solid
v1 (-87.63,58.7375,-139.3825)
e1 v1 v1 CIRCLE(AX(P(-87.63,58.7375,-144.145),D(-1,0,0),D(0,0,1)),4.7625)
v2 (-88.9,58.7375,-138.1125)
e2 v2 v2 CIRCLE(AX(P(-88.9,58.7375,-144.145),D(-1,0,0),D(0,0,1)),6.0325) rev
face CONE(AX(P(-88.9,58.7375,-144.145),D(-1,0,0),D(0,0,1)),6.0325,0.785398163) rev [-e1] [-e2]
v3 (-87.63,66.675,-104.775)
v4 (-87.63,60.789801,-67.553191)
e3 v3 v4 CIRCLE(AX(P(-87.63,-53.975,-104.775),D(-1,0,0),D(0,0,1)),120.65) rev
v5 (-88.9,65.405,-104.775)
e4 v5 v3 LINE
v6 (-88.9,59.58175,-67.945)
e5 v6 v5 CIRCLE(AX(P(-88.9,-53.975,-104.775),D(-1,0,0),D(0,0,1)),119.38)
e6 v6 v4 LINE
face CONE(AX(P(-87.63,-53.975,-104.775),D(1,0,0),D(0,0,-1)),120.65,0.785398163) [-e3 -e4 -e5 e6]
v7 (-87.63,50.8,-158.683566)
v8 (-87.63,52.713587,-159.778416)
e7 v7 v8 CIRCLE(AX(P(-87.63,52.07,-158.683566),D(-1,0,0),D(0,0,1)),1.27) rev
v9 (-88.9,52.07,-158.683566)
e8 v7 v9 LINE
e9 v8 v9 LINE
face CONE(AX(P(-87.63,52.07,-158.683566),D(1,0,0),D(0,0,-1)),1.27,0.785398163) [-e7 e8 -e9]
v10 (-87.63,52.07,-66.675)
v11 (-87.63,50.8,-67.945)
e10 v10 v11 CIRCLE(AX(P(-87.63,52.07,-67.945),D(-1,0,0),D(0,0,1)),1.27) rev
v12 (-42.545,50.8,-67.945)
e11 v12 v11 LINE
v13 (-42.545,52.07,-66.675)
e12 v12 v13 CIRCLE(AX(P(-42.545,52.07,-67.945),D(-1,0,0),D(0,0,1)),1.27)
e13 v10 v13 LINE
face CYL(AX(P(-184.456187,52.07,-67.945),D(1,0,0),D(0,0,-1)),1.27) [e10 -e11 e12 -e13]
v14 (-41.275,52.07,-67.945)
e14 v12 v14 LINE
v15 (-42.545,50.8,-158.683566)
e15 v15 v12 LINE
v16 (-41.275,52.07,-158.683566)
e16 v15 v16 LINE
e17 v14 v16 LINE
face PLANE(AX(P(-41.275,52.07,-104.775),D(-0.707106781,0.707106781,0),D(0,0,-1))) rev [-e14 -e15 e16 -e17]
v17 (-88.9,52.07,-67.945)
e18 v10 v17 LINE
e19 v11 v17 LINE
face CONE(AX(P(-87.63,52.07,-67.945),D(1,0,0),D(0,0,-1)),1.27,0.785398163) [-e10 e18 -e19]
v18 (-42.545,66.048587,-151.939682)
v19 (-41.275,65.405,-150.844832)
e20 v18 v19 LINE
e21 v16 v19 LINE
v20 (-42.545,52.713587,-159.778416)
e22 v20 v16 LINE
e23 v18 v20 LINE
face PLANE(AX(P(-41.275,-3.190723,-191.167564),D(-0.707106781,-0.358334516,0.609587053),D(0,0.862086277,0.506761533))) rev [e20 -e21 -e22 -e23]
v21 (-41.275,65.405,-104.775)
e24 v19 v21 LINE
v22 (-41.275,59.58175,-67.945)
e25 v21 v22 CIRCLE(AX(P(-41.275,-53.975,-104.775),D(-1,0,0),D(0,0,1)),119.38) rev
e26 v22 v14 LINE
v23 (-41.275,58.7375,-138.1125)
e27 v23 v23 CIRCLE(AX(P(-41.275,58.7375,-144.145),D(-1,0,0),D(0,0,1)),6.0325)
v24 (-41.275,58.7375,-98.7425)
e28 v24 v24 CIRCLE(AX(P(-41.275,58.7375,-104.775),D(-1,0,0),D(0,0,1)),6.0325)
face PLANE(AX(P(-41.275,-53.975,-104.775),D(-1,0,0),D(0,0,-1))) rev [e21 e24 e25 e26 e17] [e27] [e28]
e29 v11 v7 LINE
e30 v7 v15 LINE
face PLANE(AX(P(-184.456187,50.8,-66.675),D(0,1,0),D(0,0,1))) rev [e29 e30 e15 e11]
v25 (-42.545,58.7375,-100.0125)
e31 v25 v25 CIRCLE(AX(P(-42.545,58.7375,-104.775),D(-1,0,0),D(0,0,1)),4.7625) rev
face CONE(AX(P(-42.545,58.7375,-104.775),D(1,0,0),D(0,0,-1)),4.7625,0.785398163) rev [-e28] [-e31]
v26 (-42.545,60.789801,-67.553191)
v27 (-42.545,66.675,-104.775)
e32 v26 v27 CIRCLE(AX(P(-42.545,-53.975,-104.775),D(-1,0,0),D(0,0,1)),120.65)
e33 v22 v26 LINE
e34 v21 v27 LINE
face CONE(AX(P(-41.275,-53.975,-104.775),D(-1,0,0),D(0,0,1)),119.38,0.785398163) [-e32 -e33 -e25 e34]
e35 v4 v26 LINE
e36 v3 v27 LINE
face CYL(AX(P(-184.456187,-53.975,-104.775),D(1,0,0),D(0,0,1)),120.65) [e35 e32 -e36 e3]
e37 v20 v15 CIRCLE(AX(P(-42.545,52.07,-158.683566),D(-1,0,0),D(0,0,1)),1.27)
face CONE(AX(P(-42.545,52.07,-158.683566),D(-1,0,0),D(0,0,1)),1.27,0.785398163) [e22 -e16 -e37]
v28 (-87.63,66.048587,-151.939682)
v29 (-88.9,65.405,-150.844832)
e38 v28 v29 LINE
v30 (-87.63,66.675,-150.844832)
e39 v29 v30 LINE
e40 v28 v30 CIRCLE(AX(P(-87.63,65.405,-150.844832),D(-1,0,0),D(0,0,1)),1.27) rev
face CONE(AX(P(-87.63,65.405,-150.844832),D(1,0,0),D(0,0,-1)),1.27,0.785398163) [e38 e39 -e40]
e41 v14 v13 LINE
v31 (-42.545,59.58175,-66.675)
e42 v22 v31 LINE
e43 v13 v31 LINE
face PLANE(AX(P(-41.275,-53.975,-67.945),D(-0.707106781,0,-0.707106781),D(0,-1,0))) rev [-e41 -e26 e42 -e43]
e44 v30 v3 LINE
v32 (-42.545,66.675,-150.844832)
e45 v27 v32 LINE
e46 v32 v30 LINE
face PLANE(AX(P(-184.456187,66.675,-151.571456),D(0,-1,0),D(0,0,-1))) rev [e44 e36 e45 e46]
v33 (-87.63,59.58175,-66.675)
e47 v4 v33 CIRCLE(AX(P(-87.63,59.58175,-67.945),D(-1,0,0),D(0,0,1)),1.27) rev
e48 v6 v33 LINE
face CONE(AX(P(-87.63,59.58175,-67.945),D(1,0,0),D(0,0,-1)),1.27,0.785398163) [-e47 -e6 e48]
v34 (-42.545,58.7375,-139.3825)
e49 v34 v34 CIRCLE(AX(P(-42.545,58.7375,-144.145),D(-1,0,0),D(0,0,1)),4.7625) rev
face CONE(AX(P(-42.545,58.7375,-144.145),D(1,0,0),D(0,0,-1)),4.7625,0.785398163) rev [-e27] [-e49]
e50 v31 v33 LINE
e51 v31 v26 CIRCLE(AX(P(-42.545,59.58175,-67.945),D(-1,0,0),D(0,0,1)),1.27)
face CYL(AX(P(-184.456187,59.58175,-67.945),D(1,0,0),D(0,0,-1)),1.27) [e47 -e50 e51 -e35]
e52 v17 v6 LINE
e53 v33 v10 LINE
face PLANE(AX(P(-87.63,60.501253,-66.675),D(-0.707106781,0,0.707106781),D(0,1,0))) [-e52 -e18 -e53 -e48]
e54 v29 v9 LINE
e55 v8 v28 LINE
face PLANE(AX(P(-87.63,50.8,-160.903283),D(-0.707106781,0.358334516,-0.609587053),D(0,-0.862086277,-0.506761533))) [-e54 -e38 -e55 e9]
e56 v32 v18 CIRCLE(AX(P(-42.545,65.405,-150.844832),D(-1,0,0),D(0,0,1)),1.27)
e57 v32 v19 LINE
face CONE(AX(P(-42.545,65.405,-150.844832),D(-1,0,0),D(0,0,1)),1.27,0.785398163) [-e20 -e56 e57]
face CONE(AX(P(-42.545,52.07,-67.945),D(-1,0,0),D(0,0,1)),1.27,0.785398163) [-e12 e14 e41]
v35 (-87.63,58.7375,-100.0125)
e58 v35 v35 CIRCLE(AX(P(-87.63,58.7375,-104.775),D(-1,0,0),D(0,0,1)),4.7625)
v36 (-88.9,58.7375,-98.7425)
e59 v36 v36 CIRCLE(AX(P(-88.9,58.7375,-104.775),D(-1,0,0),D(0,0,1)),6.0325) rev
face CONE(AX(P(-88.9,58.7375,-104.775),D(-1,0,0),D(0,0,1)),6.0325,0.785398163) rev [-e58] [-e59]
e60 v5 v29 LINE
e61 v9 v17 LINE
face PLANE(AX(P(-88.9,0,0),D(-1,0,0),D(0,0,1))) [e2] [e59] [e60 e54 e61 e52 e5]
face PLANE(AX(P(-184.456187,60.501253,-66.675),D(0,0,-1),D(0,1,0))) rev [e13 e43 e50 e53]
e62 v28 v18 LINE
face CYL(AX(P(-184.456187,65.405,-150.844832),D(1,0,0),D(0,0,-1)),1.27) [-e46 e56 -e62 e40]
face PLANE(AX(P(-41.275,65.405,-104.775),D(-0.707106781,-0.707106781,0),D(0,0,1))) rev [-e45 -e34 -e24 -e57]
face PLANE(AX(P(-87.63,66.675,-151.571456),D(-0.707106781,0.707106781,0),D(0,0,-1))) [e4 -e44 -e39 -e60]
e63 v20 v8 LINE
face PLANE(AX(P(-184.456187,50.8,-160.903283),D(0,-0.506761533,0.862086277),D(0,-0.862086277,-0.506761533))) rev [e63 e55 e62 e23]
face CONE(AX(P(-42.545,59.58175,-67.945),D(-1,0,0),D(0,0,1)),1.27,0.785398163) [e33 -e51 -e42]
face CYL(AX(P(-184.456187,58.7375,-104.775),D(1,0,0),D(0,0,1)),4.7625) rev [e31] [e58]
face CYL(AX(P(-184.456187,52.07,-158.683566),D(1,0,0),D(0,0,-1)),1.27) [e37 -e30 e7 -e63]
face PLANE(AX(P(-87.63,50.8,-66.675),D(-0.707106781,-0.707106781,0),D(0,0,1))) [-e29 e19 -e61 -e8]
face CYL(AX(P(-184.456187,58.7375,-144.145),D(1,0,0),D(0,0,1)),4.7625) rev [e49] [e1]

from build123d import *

# Parameters (mm, degrees)
STOCK_HAMMERSAW_START                 = -88.9
STOCK_HAMMERSAW_MULTIBODY_1_OUTLINE_R = 4.7625
STOCK_HAMMERSAW_MULTIBODY_1_DEPTH     = 47.625
FILLET1_R                             = 1.27
CHAMFER1_SIZE                         = 1.27


# Read off the part's stored shape, not the designer's step: Stock-HammerSaw Multibody-1
with BuildPart() as part:
    # Stock-HammerSaw Multibody-1 outline → Stock-HammerSaw Multibody-1 (new body)
    with BuildSketch(Plane.YZ.offset(STOCK_HAMMERSAW_START)):
        with BuildLine():
            Line((66.675, -151.571456433), (66.675, -104.775))
            ThreePointArc((66.675, -104.775), (65.121562553, -85.476521096), (60.501252996, -66.675))
            Line((60.501252996, -66.675), (50.8, -66.675))
            Line((50.8, -66.675), (50.8, -160.903282658))
            Line((50.8, -160.903282658), (66.675, -151.571456433))
        make_face()
        with Locations((58.7375, -144.145)):
            Circle(STOCK_HAMMERSAW_MULTIBODY_1_OUTLINE_R, mode=Mode.SUBTRACT)
        with Locations((58.7375, -104.775)):
            Circle(STOCK_HAMMERSAW_MULTIBODY_1_OUTLINE_R, mode=Mode.SUBTRACT)
    extrude(amount=STOCK_HAMMERSAW_MULTIBODY_1_DEPTH)

    # Fillet1
    fillet1_edges = [part.edges().sort_by_distance(p)[0] for p in [
        (-65.0875, 66.675, -151.571456433),
        (-65.0875, 50.8, -160.903282658),
        (-65.0875, 50.8, -66.675),
        (-65.0875, 60.501252996, -66.675),
    ]]
    fillet(fillet1_edges, radius=FILLET1_R)

    # Chamfer1
    chamfer1_edges = [part.edges().sort_by_distance(p)[0] for p in [
        (-41.275, 53.975, -144.145),
        (-41.275, 53.975, -104.775),
        (-88.9, 65.194617982, -85.932902187),
        (-88.9, 53.975, -144.145),
        (-88.9, 53.975, -104.775),
        (-88.9, 50.8, -113.314283072),
        (-41.275, 50.8, -113.314283072),
        (-41.275, 55.825875065, -66.675),
        (-41.275, 59.381087146, -155.859048701),
        (-41.275, 66.675, -127.809916057),
        (-41.275, 51.171974388, -67.046974388),
        (-41.275, 60.328510865, -66.917747157),
        (-41.275, 66.507328371, -151.475523927),
        (-41.275, 51.439308188, -159.785894515),
        (-88.9, 59.381087146, -155.859048701),
        (-88.9, 66.675, -127.809916057),
        (-88.9, 55.825875065, -66.675),
        (-88.9, 51.171974388, -67.046974388),
        (-88.9, 60.328510865, -66.917747157),
        (-88.9, 66.507328371, -151.475523927),
        (-88.9, 51.439308188, -159.785894515),
        (-41.275, 65.194617982, -85.932902187),
    ]]
    chamfer(chamfer1_edges, length=CHAMFER1_SIZE)


solid = part.part
